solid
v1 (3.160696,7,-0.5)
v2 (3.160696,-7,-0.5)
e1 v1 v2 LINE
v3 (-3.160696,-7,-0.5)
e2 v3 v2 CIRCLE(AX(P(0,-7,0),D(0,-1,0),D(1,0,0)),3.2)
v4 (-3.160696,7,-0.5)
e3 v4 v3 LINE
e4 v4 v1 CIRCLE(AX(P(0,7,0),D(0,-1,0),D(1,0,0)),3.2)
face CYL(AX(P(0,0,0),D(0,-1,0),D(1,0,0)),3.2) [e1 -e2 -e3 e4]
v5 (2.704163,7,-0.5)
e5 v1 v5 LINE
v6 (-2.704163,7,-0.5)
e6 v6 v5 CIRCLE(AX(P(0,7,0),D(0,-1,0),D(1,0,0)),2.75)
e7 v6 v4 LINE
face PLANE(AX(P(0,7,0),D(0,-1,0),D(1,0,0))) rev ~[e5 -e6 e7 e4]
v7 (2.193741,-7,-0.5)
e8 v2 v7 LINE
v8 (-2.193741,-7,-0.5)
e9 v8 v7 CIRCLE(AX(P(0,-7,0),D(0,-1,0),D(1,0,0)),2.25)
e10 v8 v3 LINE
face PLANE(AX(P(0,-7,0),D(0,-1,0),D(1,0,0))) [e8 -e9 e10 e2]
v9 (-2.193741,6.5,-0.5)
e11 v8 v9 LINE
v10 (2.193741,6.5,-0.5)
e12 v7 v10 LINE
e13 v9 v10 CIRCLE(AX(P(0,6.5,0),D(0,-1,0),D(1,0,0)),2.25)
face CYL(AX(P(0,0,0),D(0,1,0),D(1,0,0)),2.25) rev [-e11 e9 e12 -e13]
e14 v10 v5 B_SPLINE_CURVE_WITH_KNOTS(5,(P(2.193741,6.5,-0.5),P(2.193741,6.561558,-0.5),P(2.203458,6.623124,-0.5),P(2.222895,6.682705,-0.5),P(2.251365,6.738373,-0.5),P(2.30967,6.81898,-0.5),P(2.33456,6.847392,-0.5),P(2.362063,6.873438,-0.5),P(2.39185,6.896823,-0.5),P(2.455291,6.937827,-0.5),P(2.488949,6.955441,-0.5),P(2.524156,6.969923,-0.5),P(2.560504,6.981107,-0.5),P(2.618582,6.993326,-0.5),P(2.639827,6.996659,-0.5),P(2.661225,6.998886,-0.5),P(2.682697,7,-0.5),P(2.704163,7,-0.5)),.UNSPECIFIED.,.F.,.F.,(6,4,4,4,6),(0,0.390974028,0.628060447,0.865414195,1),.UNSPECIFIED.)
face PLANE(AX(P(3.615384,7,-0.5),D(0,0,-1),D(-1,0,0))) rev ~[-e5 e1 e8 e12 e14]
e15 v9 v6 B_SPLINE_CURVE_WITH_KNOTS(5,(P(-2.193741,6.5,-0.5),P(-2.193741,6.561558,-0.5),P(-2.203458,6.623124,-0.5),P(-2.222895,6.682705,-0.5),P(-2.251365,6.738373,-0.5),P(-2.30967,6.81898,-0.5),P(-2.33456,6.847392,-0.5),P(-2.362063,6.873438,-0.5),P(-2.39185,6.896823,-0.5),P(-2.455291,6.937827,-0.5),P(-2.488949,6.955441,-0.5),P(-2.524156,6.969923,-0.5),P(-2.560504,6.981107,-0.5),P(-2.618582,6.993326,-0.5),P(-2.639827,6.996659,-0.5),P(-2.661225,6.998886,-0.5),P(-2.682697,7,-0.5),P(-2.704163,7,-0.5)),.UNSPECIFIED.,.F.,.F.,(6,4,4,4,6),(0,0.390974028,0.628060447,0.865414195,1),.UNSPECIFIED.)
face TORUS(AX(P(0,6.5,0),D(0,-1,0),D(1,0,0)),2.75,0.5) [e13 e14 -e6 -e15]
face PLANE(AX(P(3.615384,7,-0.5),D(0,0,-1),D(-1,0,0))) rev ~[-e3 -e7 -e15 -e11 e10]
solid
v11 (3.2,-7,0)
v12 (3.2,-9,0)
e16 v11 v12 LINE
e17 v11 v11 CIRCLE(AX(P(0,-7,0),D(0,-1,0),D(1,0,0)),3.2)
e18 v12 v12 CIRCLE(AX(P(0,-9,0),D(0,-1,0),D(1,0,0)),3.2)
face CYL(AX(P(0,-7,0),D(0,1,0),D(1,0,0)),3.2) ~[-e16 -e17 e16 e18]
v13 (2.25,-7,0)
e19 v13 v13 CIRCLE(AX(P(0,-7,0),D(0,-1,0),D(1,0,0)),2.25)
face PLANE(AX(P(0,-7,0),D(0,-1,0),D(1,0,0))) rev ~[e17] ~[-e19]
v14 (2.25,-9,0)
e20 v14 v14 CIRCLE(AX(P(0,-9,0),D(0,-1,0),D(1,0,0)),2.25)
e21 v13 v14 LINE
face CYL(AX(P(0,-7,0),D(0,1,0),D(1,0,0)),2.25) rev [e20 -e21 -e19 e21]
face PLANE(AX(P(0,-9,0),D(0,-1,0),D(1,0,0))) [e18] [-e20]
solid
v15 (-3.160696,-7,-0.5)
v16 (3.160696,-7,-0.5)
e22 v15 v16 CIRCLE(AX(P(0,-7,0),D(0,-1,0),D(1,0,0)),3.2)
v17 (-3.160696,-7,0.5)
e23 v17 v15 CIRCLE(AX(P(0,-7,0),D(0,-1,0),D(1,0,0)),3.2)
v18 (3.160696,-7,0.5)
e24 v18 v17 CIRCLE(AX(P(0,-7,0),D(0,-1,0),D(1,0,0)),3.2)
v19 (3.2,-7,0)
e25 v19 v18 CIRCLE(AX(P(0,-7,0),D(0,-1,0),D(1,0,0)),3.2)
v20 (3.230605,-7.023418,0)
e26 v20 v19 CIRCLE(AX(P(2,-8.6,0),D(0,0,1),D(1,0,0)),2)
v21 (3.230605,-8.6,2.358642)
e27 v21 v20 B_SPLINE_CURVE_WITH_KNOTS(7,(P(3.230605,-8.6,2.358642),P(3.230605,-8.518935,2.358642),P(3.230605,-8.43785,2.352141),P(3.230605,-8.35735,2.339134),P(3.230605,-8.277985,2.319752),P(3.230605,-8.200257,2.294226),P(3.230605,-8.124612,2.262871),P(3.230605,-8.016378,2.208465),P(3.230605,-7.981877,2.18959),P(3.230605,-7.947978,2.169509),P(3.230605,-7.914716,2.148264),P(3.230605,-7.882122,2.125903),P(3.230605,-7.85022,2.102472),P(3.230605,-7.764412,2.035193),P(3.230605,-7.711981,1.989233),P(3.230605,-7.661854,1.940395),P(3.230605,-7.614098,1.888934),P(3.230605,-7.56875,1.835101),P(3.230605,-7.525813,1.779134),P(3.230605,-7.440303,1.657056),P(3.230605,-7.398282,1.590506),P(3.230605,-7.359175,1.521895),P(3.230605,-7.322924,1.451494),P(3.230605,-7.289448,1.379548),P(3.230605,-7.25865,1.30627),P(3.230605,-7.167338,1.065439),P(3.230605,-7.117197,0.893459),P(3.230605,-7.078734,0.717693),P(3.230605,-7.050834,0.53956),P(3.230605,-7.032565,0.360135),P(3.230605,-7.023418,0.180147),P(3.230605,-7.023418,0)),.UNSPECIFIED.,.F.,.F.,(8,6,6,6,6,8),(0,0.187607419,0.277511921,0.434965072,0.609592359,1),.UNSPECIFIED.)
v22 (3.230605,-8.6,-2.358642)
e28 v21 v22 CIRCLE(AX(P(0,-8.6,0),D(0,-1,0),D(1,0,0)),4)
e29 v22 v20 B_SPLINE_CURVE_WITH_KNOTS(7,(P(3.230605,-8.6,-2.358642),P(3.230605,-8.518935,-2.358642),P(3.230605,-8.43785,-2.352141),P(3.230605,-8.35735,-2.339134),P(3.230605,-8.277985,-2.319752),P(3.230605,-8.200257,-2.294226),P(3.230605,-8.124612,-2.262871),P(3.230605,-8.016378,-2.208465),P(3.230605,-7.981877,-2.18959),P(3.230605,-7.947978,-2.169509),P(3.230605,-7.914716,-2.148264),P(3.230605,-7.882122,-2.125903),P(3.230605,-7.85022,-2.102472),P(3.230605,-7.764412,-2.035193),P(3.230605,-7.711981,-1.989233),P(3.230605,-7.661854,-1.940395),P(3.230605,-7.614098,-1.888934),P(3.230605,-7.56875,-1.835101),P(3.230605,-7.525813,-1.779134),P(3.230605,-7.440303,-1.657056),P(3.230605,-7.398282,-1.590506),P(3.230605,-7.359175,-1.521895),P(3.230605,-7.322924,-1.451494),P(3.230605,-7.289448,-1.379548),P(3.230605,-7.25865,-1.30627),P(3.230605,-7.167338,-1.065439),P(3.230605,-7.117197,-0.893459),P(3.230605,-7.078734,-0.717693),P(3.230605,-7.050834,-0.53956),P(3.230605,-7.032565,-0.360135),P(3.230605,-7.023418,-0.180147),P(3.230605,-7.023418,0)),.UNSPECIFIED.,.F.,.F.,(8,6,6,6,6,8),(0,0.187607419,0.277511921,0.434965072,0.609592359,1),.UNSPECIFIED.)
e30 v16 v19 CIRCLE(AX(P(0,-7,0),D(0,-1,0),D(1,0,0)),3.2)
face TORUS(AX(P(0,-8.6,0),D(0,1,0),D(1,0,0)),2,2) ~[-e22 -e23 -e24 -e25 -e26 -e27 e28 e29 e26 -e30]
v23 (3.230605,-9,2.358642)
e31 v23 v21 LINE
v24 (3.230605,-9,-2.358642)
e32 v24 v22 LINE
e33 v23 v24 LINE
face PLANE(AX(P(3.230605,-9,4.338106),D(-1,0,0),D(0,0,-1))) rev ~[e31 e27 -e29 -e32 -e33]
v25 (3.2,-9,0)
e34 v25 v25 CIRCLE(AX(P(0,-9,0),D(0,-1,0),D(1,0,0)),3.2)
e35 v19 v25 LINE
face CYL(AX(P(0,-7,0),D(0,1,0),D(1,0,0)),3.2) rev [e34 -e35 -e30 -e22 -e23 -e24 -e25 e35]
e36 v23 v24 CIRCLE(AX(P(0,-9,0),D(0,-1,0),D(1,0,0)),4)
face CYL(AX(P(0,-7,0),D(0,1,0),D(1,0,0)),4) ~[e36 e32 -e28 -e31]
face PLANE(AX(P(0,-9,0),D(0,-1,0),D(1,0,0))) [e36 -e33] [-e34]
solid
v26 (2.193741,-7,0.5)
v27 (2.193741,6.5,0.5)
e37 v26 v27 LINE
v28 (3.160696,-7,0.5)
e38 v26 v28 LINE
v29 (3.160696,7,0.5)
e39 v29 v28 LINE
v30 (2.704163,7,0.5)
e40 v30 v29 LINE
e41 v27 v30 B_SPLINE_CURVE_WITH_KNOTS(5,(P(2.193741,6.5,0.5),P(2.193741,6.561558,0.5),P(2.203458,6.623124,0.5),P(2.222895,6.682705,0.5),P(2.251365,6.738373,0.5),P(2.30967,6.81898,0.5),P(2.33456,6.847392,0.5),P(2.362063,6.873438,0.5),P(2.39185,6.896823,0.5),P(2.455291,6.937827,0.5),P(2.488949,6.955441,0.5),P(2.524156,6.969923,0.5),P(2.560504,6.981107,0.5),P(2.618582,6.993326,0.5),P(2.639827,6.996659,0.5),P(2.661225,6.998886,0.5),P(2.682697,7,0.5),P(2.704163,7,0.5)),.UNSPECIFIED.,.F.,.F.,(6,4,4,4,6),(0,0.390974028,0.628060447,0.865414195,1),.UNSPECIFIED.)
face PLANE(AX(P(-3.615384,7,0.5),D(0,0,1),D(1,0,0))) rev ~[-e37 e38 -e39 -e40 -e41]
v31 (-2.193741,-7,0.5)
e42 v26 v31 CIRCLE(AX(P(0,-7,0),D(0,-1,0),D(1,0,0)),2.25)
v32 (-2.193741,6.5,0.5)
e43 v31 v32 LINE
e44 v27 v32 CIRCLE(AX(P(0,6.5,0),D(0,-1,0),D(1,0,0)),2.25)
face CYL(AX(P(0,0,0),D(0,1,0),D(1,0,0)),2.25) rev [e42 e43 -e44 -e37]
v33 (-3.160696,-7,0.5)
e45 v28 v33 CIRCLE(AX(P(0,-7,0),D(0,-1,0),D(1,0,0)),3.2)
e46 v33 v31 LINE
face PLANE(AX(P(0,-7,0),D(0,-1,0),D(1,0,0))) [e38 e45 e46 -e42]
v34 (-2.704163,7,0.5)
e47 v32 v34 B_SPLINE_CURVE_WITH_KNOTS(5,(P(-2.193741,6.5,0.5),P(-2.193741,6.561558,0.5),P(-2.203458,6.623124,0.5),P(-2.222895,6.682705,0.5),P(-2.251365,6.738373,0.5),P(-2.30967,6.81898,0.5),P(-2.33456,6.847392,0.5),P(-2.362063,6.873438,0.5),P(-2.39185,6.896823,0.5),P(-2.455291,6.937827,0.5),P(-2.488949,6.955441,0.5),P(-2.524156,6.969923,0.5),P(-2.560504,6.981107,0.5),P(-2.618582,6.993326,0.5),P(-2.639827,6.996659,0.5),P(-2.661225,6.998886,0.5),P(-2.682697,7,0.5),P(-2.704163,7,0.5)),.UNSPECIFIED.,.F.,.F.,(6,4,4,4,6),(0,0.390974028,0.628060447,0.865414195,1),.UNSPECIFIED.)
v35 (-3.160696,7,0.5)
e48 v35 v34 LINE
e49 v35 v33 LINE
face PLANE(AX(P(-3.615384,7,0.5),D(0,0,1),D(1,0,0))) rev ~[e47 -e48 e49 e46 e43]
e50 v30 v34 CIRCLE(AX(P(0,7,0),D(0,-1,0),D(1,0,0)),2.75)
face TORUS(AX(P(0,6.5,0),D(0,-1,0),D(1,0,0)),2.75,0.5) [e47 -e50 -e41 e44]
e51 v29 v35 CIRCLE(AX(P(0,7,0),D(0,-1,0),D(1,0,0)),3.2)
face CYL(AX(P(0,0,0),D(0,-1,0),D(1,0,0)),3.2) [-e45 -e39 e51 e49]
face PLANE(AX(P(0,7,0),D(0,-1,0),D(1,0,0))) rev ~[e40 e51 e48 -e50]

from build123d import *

# Parameters (mm, degrees)
F0_R      = 3.2
F0_R_2    = 2.25
F1_DEPTH  = 7
F2_R      = 0.5
F3_R      = 4
F3_R_2    = 3.2
F4_DEPTH  = 2
F6_DEPTH  = 2
F8_DEPTH  = 14
F10_DEPTH = 25


# Not quite as in the source:
# - a fillet or chamfer that OpenCascade refuses, or shapes differently, is made with other operations: its cross-section is extruded or revolved along the edge and cut away or added


with BuildPart() as f1:
    # F0 (on Front) → F1 (new body, symmetric)
    with BuildSketch(Plane.XZ):
        Circle(F0_R)
        Circle(F0_R_2, mode=Mode.SUBTRACT)
    extrude(amount=F1_DEPTH, both=True)

    # F2
    f2_edges = [f1.edges().sort_by_distance(p)[0] for p in [
        (-2.25, 7, 0),
    ]]
    fillet(f2_edges, radius=F2_R)

    # F3 (on face) → F4 (join)
    with BuildSketch(Plane.XZ.offset(7)):
        Circle(F3_R)
        Circle(F3_R_2, mode=Mode.SUBTRACT)
    extrude(amount=F4_DEPTH)

    # F5: fillet of radius 2 on 1 edges, made by hand

    # F5_s1 → F5_t2 (revolve, cut)
    with BuildSketch(Plane.XY):
        with BuildLine():
            ThreePointArc((4, -8.6), (3.788854382, -7.705572809), (3.2, -7))
            Line((3.2, -7), (4, -7))
            Line((4, -7), (4, -8.6))
        make_face()
    revolve(axis=Axis((0, -7, 0), (0, -1, 0)), mode=Mode.SUBTRACT)


with BuildPart() as f6:
    # F6 (new): a face of the model
    f6_faces = [f1.part.faces().sort_by_distance(p)[0] for p in [
        (-3.109490332, -7, 0),
    ]]
    extrude(f6_faces, amount=F6_DEPTH)


with BuildPart() as f1_1:
    add(f1.part)

    # F7 (on face) → F8 (cut)
    with BuildSketch(Plane(origin=(0, 7, 0), x_dir=(-1, 0, 0), z_dir=(0, 1, 0))):
        with BuildLine():
            Line((3.6153841381, -0.5), (3.6153841381, 0.5))
            Line((3.6153841381, 0.5), (3.1606961259, 0.5))
            ThreePointArc((3.1606961259, 0.5), (3.1901588991, 0.2507712077), (3.2, 0))
            ThreePointArc((3.2, 0), (3.1901588991, -0.2507712077), (3.1606961259, -0.5))
            Line((3.1606961259, -0.5), (3.6153841381, -0.5))
        make_face()
        with BuildLine():
            ThreePointArc((3.2, 0), (3.1901588991, 0.2507712077), (3.1606961259, 0.5))
            Line((3.1606961259, 0.5), (2.7041634566, 0.5))
            ThreePointArc((2.7041634566, 0.5), (2.7385168893, 0.2510482965), (2.75, 0))
            ThreePointArc((2.75, 0), (2.7385168893, -0.2510482965), (2.7041634566, -0.5))
            Line((2.7041634566, -0.5), (3.1606961259, -0.5))
            ThreePointArc((3.1606961259, -0.5), (3.1901588991, -0.2507712077), (3.2, 0))
        make_face()
        with BuildLine():
            ThreePointArc((2.75, 0), (2.7385168893, 0.2510482965), (2.7041634566, 0.5))
            Line((2.7041634566, 0.5), (-2.7041634566, 0.5))
            ThreePointArc((-2.7041634566, 0.5), (-2.75, 0), (-2.7041634566, -0.5))
            Line((-2.7041634566, -0.5), (2.7041634566, -0.5))
            ThreePointArc((2.7041634566, -0.5), (2.7385168893, -0.2510482965), (2.75, 0))
        make_face()
        with BuildLine():
            ThreePointArc((-3.1606961259, -0.5), (-3.2, 0), (-3.1606961259, 0.5))
            Line((-3.1606961259, 0.5), (-3.6153841381, 0.5))
            Line((-3.6153841381, 0.5), (-3.6153841381, -0.5))
            Line((-3.6153841381, -0.5), (-3.1606961259, -0.5))
        make_face()
        with BuildLine():
            Line((-2.7041634566, 0.5), (-3.1606961259, 0.5))
            ThreePointArc((-3.1606961259, 0.5), (-3.2, 0), (-3.1606961259, -0.5))
            Line((-3.1606961259, -0.5), (-2.7041634566, -0.5))
            ThreePointArc((-2.7041634566, -0.5), (-2.75, 0), (-2.7041634566, 0.5))
        make_face()
    extrude(amount=-F8_DEPTH, mode=Mode.SUBTRACT)

    # F9 (on face) → F10 (cut)
    with BuildSketch(Plane.XZ.offset(9)):
        with BuildLine():
            Line((3.2306045759, -2.3586424218), (3.2306045759, -4.3381056748))
            Line((3.2306045759, -4.3381056748), (4.7693954241, -4.3381056748))
            Line((4.7693954241, -4.3381056748), (4.7693954241, 4.3381056748))
            Line((4.7693954241, 4.3381056748), (3.2306045759, 4.3381056748))
            Line((3.2306045759, 4.3381056748), (3.2306045759, 2.3586424218))
            ThreePointArc((3.2306045759, 2.3586424218), (3.8027896539, 1.2404800878), (4, 0))
            ThreePointArc((4, 0), (3.8027896539, -1.2404800878), (3.2306045759, -2.3586424218))
        make_face()
        with BuildLine():
            Line((3.2306045759, 2.3586424218), (3.2306045759, -2.3586424218))
            ThreePointArc((3.2306045759, -2.3586424218), (3.8027896539, -1.2404800878), (4, 0))
            ThreePointArc((4, 0), (3.8027896539, 1.2404800878), (3.2306045759, 2.3586424218))
        make_face()
    extrude(amount=-F10_DEPTH, mode=Mode.SUBTRACT)


solid = Compound([f6.part, f1_1.part])
